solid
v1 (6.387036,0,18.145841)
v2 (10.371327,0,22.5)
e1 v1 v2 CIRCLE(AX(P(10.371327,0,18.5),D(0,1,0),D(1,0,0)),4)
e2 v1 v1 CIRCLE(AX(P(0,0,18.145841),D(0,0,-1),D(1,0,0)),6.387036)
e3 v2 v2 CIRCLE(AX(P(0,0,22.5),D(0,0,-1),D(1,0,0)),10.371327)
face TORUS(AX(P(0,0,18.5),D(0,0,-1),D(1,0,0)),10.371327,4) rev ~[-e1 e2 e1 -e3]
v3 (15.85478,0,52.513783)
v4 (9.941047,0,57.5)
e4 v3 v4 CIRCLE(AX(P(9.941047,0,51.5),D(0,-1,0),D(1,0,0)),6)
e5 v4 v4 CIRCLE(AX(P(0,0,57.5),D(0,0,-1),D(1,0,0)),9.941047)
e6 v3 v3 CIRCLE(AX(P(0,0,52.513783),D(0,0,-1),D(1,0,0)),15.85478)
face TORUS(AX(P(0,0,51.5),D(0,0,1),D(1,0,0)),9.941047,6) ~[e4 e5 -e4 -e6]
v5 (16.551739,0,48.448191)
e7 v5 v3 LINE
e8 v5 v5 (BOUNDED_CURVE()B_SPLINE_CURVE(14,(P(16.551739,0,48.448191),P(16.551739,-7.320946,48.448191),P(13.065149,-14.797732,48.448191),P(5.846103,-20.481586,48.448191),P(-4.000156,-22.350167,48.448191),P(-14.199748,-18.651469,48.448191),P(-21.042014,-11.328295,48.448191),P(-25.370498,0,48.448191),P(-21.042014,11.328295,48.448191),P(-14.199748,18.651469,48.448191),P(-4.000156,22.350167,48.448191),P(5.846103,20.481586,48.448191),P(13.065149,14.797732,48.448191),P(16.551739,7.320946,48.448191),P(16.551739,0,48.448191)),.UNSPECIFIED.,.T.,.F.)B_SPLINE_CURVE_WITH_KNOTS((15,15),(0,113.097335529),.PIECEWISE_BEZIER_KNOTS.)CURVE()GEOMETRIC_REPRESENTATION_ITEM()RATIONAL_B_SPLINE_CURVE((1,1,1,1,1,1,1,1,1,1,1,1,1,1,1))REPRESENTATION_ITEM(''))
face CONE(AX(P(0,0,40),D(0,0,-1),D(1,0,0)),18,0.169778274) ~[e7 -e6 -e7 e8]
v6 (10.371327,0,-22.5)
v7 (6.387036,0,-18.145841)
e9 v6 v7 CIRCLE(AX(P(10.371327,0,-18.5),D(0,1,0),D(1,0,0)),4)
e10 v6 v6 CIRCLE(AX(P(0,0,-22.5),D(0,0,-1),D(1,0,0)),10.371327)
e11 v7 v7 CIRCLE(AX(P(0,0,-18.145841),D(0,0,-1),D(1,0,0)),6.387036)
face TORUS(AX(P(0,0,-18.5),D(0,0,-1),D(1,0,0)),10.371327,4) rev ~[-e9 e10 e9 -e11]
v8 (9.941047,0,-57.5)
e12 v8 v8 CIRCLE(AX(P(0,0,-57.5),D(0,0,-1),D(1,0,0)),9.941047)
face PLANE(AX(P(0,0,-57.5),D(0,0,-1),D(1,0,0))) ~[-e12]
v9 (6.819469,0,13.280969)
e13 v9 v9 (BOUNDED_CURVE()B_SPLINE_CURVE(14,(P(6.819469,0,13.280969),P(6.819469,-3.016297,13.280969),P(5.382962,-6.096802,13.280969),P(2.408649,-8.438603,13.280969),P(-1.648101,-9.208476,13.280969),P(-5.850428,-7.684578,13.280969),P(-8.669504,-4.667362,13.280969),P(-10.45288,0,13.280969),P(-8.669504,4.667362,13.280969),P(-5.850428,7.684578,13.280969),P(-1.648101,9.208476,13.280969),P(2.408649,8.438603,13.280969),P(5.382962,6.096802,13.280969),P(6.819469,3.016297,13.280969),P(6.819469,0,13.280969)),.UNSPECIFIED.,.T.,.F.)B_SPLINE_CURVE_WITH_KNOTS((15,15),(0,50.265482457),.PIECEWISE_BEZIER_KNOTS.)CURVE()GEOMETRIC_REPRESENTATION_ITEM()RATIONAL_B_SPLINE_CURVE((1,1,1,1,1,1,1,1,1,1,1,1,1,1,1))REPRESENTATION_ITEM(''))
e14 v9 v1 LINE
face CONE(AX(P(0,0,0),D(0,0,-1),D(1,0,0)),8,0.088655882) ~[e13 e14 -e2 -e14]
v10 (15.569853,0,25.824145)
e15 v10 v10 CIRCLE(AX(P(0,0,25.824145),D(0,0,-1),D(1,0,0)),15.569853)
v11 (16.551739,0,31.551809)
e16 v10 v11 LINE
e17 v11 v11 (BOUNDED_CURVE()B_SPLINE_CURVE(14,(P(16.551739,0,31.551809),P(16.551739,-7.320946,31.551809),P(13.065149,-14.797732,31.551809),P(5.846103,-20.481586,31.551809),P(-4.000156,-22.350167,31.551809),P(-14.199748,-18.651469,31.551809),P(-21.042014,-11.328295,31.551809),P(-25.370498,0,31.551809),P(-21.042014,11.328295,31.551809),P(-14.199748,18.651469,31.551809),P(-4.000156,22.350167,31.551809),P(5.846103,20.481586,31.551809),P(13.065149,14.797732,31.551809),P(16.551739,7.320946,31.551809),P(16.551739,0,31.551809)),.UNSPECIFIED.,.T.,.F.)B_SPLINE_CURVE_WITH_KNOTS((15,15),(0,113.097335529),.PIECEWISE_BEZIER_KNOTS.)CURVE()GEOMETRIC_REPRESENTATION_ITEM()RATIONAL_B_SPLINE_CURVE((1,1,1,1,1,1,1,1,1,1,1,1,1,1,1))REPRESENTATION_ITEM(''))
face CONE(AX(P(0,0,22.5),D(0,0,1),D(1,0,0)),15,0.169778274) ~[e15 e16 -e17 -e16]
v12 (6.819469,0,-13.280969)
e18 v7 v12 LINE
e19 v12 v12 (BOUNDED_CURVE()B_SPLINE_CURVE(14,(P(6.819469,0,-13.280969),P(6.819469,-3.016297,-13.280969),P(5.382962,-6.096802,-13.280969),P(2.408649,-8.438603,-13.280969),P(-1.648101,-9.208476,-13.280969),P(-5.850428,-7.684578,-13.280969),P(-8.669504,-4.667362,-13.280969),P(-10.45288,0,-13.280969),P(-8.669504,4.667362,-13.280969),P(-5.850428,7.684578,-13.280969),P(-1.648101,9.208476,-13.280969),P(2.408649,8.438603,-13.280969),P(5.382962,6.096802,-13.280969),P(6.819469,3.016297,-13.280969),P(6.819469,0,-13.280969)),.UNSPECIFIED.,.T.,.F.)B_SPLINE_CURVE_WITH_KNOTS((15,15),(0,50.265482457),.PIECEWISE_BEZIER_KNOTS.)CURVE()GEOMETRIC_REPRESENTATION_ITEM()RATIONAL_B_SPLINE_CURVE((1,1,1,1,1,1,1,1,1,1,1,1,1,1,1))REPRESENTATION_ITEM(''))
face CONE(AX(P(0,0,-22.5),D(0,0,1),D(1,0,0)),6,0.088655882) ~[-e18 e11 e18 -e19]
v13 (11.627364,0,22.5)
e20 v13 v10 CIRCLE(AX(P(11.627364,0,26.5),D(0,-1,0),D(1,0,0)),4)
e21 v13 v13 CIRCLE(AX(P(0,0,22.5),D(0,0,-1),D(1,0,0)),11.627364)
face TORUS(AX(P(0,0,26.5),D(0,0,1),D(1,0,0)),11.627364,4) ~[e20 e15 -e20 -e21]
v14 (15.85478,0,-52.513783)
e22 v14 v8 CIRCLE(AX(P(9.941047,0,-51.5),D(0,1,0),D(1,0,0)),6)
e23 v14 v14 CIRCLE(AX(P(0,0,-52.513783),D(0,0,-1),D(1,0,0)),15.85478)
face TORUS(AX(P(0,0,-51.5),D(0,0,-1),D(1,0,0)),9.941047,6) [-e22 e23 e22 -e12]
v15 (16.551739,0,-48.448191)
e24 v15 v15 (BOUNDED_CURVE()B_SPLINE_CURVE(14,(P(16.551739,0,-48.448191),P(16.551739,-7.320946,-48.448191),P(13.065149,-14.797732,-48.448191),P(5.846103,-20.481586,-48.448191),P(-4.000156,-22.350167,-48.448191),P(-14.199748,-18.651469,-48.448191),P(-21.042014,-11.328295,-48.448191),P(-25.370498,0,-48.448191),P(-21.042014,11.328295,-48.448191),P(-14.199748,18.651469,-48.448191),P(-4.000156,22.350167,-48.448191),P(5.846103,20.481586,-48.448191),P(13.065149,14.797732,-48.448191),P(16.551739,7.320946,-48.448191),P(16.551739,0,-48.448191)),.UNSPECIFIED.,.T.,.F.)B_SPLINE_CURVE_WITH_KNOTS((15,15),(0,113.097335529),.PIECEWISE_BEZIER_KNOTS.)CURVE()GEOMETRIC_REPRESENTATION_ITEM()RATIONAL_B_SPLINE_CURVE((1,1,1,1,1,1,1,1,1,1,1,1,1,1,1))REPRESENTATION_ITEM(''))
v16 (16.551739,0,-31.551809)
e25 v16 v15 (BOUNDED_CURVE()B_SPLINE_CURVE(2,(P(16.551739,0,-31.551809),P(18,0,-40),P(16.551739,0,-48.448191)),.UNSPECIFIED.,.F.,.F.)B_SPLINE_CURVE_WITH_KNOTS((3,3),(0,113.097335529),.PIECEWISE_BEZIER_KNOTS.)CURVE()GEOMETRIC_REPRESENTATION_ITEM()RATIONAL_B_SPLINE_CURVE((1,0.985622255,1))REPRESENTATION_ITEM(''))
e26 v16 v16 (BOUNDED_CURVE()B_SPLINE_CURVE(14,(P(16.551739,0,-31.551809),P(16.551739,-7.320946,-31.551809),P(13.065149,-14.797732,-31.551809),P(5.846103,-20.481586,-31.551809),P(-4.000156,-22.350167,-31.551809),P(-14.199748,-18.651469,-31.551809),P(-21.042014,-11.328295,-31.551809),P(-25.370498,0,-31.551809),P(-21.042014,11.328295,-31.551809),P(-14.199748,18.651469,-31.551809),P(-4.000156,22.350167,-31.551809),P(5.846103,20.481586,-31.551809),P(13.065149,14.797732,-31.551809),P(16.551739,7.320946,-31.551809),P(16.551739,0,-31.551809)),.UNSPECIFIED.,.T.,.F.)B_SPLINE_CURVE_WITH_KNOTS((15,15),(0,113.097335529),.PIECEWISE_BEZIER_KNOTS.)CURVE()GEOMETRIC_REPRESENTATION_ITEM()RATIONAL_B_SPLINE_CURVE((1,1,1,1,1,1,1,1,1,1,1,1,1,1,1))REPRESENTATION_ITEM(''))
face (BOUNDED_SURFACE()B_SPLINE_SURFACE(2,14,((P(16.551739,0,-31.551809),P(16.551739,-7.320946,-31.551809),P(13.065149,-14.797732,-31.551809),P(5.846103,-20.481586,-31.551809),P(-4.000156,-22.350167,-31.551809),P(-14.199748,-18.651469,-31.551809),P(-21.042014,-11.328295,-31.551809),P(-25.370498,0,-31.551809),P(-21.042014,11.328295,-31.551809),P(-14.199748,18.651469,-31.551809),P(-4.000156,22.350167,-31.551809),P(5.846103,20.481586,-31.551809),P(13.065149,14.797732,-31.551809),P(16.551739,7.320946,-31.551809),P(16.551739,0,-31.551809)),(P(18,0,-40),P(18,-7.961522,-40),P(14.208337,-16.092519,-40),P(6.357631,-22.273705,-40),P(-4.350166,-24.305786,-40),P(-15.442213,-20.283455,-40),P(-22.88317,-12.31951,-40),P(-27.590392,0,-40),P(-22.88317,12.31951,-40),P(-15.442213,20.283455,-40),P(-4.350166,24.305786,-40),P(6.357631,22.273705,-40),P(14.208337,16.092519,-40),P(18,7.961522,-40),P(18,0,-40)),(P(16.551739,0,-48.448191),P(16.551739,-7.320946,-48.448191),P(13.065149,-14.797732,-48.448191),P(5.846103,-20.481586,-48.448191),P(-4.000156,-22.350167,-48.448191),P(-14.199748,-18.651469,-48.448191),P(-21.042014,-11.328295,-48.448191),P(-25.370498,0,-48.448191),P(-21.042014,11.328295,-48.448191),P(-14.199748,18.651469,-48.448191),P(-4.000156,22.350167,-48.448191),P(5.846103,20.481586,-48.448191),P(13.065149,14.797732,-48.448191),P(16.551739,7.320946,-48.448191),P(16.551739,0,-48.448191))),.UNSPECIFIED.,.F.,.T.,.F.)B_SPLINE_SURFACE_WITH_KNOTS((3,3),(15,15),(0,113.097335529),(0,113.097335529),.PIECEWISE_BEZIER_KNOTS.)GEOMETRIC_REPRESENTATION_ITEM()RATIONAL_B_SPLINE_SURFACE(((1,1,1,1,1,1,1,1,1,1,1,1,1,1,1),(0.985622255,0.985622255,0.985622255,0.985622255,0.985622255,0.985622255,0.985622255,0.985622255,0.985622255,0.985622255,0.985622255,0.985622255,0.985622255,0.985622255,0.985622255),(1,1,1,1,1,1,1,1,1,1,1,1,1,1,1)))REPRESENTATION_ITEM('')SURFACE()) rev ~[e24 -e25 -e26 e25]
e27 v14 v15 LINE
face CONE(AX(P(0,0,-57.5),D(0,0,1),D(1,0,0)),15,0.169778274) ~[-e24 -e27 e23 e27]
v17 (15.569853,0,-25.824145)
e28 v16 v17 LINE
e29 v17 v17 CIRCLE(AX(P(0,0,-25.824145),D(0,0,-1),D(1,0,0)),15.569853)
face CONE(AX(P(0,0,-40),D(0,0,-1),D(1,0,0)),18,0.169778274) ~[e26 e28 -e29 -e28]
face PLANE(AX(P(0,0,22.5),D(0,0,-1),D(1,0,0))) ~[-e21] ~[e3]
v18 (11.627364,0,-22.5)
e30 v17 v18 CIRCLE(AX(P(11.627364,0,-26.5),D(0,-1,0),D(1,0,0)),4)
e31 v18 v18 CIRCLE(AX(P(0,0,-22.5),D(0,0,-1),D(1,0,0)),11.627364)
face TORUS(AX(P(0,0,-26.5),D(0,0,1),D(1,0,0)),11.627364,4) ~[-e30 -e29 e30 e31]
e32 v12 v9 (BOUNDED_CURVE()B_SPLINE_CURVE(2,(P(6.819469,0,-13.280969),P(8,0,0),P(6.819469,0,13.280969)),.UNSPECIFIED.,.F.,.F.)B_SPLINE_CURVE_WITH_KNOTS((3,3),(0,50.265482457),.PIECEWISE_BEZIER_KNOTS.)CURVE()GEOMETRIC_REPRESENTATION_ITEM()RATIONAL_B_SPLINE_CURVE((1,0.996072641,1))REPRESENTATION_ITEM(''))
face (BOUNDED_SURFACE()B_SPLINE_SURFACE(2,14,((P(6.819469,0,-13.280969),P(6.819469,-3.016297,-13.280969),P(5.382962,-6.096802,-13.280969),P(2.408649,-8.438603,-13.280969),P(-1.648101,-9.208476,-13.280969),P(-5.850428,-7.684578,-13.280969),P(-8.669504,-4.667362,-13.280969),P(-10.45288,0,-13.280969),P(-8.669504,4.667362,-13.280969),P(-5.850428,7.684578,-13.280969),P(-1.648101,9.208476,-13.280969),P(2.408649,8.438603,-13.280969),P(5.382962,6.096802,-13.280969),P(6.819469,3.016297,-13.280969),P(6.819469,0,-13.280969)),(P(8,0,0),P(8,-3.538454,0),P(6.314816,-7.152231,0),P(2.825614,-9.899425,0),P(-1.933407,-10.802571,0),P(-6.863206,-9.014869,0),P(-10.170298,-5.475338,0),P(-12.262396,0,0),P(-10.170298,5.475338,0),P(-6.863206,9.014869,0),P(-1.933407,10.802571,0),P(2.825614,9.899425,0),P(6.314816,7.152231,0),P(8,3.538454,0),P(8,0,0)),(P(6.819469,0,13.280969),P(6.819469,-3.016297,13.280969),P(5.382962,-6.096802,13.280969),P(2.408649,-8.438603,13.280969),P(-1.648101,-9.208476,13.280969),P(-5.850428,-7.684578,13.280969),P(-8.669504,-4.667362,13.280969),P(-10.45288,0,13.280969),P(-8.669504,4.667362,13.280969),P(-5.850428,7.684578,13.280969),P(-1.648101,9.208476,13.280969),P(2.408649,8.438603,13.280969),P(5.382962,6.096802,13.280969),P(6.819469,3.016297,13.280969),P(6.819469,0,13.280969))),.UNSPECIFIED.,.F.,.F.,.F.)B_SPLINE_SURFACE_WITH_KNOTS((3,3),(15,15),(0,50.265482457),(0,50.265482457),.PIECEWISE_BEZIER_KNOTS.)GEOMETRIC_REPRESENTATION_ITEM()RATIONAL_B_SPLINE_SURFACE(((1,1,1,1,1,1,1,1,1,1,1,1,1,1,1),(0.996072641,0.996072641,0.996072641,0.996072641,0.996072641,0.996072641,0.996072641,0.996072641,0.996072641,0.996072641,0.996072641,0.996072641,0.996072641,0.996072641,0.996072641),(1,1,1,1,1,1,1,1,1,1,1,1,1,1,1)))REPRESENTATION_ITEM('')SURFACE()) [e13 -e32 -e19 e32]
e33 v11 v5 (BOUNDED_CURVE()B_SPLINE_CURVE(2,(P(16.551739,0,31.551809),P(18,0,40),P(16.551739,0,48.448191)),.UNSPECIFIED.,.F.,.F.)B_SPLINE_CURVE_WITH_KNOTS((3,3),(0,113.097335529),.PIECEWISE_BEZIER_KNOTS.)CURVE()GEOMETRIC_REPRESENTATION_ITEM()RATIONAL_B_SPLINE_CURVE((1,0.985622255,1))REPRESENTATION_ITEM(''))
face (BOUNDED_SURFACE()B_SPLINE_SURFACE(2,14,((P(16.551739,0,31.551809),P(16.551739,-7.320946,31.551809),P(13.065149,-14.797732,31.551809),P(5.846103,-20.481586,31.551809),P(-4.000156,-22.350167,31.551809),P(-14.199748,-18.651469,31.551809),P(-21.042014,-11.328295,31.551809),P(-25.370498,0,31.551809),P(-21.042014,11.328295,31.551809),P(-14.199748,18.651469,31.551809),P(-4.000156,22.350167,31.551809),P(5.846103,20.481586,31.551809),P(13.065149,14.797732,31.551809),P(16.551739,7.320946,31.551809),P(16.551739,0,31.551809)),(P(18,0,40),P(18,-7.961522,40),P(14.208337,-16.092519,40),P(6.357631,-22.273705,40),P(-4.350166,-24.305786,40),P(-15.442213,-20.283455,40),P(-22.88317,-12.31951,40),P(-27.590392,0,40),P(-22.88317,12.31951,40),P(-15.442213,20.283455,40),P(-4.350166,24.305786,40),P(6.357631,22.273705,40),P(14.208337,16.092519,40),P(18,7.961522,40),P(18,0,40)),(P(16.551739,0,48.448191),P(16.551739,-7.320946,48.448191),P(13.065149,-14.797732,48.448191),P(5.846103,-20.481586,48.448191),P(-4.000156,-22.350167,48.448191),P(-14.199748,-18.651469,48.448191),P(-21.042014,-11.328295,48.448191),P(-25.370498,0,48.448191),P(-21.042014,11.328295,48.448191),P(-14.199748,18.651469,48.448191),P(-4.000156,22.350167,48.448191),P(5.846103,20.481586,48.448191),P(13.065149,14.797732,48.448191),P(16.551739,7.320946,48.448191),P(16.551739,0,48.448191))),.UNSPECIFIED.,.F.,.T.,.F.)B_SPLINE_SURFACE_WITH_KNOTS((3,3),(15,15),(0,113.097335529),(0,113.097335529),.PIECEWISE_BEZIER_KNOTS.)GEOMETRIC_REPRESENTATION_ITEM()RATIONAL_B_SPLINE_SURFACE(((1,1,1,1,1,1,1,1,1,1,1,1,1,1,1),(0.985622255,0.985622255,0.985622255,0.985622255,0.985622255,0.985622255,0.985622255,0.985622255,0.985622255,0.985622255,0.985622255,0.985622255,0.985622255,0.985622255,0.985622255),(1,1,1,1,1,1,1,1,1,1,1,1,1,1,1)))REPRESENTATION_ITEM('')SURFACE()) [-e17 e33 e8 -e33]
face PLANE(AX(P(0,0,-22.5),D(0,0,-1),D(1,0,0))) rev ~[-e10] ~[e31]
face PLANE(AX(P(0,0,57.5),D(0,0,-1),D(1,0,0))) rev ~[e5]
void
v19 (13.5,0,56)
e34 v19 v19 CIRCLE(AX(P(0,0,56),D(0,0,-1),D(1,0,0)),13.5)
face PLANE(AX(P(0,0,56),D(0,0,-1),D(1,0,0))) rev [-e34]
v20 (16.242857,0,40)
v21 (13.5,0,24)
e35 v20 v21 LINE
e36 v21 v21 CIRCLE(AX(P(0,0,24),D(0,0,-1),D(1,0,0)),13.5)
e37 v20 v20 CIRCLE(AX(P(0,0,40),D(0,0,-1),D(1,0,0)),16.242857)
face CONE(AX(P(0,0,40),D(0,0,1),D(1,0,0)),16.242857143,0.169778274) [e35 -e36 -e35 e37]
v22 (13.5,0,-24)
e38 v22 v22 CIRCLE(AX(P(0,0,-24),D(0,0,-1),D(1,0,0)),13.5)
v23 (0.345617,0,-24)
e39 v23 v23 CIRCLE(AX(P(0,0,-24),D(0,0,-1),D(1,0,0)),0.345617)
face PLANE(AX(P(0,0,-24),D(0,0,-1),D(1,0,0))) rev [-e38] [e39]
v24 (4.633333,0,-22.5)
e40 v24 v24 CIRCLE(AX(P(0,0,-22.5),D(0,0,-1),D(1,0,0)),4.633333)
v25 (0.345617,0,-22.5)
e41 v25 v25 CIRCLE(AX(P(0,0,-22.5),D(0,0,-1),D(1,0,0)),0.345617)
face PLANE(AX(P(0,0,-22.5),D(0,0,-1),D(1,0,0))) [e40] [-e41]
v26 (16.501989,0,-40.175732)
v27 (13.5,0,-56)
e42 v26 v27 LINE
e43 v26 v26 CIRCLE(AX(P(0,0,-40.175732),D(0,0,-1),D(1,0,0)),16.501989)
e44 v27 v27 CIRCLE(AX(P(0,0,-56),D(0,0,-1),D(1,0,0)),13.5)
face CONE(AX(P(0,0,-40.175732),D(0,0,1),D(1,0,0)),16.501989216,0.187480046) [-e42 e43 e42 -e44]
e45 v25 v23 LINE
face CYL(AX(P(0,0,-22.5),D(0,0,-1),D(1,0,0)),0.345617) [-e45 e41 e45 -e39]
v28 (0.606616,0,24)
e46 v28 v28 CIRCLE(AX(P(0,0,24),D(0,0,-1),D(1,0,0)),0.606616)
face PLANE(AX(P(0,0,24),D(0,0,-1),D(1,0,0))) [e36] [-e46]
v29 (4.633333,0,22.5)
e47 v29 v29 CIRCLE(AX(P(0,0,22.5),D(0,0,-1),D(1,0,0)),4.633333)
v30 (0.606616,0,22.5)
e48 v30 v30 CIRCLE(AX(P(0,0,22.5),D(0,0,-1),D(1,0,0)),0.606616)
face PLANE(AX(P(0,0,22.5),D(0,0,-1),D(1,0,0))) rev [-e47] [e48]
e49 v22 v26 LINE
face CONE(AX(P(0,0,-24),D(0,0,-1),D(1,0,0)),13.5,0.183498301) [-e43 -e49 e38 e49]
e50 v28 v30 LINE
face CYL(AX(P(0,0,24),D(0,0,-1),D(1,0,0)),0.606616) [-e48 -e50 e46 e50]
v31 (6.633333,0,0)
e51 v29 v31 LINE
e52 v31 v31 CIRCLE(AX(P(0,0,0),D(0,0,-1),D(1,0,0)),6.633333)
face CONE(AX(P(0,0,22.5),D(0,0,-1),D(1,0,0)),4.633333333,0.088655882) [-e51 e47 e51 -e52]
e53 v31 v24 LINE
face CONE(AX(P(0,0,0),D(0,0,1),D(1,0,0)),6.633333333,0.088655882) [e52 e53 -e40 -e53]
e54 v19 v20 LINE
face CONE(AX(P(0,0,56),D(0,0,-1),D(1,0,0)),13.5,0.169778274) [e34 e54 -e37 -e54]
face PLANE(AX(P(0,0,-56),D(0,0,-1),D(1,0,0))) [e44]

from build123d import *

# Parameters (mm, degrees)
F2_R = 4
F3_R = 50
F4_R = 6
F5_R = 150


with BuildPart() as f1:
    # F0 (on Front) → F1 (revolve)
    with BuildSketch(Plane.XZ):
        Polygon((15, 57.5), (0, 57.5), (0, 56), (13.5, 56), (16.2428571429, 40), (13.5, 24), (4.5, 24), (0.6066159112, 24), (0.6066159112, 22.5), (4.6333333333, 22.5), (6.6333333333, 0), (4.6333333333, -22.5), (0.3456167178, -22.5), (0.3456167178, -24), (4.5, -24), (13.5, -24), (16.5019892156, -40.1757322252), (13.5, -56), (0, -56), (0, -57.5), (15, -57.5), (18, -40), (15, -22.5), (6, -22.5), (8, 0), (6, 22.5), (15, 22.5), (18, 40), align=None)
    revolve(axis=Axis((0, 0, 66.6587725282), (0, 0, -1)))

    # F2
    f2_edges = [f1.edges().sort_by_distance(p)[0] for p in [
        (-15, 0, -22.5),
        (-6, 0, -22.5),
        (-6, 0, 22.5),
        (-15, 0, 22.5),
    ]]
    fillet(f2_edges, radius=F2_R)

    # F3
    f3_edges = [f1.edges().sort_by_distance(p)[0] for p in [
        (-18, 0, 40),
        (-18, 0, -40),
    ]]
    fillet(f3_edges, radius=F3_R)

    # F4
    f4_edges = [f1.edges().sort_by_distance(p)[0] for p in [
        (-15, 0, 57.5),
        (-15, 0, -57.5),
    ]]
    fillet(f4_edges, radius=F4_R)

    # F5
    f5_edges = [f1.edges().sort_by_distance(p)[0] for p in [
        (-8, 0, 0),
    ]]
    fillet(f5_edges, radius=F5_R)


solid = f1.part
